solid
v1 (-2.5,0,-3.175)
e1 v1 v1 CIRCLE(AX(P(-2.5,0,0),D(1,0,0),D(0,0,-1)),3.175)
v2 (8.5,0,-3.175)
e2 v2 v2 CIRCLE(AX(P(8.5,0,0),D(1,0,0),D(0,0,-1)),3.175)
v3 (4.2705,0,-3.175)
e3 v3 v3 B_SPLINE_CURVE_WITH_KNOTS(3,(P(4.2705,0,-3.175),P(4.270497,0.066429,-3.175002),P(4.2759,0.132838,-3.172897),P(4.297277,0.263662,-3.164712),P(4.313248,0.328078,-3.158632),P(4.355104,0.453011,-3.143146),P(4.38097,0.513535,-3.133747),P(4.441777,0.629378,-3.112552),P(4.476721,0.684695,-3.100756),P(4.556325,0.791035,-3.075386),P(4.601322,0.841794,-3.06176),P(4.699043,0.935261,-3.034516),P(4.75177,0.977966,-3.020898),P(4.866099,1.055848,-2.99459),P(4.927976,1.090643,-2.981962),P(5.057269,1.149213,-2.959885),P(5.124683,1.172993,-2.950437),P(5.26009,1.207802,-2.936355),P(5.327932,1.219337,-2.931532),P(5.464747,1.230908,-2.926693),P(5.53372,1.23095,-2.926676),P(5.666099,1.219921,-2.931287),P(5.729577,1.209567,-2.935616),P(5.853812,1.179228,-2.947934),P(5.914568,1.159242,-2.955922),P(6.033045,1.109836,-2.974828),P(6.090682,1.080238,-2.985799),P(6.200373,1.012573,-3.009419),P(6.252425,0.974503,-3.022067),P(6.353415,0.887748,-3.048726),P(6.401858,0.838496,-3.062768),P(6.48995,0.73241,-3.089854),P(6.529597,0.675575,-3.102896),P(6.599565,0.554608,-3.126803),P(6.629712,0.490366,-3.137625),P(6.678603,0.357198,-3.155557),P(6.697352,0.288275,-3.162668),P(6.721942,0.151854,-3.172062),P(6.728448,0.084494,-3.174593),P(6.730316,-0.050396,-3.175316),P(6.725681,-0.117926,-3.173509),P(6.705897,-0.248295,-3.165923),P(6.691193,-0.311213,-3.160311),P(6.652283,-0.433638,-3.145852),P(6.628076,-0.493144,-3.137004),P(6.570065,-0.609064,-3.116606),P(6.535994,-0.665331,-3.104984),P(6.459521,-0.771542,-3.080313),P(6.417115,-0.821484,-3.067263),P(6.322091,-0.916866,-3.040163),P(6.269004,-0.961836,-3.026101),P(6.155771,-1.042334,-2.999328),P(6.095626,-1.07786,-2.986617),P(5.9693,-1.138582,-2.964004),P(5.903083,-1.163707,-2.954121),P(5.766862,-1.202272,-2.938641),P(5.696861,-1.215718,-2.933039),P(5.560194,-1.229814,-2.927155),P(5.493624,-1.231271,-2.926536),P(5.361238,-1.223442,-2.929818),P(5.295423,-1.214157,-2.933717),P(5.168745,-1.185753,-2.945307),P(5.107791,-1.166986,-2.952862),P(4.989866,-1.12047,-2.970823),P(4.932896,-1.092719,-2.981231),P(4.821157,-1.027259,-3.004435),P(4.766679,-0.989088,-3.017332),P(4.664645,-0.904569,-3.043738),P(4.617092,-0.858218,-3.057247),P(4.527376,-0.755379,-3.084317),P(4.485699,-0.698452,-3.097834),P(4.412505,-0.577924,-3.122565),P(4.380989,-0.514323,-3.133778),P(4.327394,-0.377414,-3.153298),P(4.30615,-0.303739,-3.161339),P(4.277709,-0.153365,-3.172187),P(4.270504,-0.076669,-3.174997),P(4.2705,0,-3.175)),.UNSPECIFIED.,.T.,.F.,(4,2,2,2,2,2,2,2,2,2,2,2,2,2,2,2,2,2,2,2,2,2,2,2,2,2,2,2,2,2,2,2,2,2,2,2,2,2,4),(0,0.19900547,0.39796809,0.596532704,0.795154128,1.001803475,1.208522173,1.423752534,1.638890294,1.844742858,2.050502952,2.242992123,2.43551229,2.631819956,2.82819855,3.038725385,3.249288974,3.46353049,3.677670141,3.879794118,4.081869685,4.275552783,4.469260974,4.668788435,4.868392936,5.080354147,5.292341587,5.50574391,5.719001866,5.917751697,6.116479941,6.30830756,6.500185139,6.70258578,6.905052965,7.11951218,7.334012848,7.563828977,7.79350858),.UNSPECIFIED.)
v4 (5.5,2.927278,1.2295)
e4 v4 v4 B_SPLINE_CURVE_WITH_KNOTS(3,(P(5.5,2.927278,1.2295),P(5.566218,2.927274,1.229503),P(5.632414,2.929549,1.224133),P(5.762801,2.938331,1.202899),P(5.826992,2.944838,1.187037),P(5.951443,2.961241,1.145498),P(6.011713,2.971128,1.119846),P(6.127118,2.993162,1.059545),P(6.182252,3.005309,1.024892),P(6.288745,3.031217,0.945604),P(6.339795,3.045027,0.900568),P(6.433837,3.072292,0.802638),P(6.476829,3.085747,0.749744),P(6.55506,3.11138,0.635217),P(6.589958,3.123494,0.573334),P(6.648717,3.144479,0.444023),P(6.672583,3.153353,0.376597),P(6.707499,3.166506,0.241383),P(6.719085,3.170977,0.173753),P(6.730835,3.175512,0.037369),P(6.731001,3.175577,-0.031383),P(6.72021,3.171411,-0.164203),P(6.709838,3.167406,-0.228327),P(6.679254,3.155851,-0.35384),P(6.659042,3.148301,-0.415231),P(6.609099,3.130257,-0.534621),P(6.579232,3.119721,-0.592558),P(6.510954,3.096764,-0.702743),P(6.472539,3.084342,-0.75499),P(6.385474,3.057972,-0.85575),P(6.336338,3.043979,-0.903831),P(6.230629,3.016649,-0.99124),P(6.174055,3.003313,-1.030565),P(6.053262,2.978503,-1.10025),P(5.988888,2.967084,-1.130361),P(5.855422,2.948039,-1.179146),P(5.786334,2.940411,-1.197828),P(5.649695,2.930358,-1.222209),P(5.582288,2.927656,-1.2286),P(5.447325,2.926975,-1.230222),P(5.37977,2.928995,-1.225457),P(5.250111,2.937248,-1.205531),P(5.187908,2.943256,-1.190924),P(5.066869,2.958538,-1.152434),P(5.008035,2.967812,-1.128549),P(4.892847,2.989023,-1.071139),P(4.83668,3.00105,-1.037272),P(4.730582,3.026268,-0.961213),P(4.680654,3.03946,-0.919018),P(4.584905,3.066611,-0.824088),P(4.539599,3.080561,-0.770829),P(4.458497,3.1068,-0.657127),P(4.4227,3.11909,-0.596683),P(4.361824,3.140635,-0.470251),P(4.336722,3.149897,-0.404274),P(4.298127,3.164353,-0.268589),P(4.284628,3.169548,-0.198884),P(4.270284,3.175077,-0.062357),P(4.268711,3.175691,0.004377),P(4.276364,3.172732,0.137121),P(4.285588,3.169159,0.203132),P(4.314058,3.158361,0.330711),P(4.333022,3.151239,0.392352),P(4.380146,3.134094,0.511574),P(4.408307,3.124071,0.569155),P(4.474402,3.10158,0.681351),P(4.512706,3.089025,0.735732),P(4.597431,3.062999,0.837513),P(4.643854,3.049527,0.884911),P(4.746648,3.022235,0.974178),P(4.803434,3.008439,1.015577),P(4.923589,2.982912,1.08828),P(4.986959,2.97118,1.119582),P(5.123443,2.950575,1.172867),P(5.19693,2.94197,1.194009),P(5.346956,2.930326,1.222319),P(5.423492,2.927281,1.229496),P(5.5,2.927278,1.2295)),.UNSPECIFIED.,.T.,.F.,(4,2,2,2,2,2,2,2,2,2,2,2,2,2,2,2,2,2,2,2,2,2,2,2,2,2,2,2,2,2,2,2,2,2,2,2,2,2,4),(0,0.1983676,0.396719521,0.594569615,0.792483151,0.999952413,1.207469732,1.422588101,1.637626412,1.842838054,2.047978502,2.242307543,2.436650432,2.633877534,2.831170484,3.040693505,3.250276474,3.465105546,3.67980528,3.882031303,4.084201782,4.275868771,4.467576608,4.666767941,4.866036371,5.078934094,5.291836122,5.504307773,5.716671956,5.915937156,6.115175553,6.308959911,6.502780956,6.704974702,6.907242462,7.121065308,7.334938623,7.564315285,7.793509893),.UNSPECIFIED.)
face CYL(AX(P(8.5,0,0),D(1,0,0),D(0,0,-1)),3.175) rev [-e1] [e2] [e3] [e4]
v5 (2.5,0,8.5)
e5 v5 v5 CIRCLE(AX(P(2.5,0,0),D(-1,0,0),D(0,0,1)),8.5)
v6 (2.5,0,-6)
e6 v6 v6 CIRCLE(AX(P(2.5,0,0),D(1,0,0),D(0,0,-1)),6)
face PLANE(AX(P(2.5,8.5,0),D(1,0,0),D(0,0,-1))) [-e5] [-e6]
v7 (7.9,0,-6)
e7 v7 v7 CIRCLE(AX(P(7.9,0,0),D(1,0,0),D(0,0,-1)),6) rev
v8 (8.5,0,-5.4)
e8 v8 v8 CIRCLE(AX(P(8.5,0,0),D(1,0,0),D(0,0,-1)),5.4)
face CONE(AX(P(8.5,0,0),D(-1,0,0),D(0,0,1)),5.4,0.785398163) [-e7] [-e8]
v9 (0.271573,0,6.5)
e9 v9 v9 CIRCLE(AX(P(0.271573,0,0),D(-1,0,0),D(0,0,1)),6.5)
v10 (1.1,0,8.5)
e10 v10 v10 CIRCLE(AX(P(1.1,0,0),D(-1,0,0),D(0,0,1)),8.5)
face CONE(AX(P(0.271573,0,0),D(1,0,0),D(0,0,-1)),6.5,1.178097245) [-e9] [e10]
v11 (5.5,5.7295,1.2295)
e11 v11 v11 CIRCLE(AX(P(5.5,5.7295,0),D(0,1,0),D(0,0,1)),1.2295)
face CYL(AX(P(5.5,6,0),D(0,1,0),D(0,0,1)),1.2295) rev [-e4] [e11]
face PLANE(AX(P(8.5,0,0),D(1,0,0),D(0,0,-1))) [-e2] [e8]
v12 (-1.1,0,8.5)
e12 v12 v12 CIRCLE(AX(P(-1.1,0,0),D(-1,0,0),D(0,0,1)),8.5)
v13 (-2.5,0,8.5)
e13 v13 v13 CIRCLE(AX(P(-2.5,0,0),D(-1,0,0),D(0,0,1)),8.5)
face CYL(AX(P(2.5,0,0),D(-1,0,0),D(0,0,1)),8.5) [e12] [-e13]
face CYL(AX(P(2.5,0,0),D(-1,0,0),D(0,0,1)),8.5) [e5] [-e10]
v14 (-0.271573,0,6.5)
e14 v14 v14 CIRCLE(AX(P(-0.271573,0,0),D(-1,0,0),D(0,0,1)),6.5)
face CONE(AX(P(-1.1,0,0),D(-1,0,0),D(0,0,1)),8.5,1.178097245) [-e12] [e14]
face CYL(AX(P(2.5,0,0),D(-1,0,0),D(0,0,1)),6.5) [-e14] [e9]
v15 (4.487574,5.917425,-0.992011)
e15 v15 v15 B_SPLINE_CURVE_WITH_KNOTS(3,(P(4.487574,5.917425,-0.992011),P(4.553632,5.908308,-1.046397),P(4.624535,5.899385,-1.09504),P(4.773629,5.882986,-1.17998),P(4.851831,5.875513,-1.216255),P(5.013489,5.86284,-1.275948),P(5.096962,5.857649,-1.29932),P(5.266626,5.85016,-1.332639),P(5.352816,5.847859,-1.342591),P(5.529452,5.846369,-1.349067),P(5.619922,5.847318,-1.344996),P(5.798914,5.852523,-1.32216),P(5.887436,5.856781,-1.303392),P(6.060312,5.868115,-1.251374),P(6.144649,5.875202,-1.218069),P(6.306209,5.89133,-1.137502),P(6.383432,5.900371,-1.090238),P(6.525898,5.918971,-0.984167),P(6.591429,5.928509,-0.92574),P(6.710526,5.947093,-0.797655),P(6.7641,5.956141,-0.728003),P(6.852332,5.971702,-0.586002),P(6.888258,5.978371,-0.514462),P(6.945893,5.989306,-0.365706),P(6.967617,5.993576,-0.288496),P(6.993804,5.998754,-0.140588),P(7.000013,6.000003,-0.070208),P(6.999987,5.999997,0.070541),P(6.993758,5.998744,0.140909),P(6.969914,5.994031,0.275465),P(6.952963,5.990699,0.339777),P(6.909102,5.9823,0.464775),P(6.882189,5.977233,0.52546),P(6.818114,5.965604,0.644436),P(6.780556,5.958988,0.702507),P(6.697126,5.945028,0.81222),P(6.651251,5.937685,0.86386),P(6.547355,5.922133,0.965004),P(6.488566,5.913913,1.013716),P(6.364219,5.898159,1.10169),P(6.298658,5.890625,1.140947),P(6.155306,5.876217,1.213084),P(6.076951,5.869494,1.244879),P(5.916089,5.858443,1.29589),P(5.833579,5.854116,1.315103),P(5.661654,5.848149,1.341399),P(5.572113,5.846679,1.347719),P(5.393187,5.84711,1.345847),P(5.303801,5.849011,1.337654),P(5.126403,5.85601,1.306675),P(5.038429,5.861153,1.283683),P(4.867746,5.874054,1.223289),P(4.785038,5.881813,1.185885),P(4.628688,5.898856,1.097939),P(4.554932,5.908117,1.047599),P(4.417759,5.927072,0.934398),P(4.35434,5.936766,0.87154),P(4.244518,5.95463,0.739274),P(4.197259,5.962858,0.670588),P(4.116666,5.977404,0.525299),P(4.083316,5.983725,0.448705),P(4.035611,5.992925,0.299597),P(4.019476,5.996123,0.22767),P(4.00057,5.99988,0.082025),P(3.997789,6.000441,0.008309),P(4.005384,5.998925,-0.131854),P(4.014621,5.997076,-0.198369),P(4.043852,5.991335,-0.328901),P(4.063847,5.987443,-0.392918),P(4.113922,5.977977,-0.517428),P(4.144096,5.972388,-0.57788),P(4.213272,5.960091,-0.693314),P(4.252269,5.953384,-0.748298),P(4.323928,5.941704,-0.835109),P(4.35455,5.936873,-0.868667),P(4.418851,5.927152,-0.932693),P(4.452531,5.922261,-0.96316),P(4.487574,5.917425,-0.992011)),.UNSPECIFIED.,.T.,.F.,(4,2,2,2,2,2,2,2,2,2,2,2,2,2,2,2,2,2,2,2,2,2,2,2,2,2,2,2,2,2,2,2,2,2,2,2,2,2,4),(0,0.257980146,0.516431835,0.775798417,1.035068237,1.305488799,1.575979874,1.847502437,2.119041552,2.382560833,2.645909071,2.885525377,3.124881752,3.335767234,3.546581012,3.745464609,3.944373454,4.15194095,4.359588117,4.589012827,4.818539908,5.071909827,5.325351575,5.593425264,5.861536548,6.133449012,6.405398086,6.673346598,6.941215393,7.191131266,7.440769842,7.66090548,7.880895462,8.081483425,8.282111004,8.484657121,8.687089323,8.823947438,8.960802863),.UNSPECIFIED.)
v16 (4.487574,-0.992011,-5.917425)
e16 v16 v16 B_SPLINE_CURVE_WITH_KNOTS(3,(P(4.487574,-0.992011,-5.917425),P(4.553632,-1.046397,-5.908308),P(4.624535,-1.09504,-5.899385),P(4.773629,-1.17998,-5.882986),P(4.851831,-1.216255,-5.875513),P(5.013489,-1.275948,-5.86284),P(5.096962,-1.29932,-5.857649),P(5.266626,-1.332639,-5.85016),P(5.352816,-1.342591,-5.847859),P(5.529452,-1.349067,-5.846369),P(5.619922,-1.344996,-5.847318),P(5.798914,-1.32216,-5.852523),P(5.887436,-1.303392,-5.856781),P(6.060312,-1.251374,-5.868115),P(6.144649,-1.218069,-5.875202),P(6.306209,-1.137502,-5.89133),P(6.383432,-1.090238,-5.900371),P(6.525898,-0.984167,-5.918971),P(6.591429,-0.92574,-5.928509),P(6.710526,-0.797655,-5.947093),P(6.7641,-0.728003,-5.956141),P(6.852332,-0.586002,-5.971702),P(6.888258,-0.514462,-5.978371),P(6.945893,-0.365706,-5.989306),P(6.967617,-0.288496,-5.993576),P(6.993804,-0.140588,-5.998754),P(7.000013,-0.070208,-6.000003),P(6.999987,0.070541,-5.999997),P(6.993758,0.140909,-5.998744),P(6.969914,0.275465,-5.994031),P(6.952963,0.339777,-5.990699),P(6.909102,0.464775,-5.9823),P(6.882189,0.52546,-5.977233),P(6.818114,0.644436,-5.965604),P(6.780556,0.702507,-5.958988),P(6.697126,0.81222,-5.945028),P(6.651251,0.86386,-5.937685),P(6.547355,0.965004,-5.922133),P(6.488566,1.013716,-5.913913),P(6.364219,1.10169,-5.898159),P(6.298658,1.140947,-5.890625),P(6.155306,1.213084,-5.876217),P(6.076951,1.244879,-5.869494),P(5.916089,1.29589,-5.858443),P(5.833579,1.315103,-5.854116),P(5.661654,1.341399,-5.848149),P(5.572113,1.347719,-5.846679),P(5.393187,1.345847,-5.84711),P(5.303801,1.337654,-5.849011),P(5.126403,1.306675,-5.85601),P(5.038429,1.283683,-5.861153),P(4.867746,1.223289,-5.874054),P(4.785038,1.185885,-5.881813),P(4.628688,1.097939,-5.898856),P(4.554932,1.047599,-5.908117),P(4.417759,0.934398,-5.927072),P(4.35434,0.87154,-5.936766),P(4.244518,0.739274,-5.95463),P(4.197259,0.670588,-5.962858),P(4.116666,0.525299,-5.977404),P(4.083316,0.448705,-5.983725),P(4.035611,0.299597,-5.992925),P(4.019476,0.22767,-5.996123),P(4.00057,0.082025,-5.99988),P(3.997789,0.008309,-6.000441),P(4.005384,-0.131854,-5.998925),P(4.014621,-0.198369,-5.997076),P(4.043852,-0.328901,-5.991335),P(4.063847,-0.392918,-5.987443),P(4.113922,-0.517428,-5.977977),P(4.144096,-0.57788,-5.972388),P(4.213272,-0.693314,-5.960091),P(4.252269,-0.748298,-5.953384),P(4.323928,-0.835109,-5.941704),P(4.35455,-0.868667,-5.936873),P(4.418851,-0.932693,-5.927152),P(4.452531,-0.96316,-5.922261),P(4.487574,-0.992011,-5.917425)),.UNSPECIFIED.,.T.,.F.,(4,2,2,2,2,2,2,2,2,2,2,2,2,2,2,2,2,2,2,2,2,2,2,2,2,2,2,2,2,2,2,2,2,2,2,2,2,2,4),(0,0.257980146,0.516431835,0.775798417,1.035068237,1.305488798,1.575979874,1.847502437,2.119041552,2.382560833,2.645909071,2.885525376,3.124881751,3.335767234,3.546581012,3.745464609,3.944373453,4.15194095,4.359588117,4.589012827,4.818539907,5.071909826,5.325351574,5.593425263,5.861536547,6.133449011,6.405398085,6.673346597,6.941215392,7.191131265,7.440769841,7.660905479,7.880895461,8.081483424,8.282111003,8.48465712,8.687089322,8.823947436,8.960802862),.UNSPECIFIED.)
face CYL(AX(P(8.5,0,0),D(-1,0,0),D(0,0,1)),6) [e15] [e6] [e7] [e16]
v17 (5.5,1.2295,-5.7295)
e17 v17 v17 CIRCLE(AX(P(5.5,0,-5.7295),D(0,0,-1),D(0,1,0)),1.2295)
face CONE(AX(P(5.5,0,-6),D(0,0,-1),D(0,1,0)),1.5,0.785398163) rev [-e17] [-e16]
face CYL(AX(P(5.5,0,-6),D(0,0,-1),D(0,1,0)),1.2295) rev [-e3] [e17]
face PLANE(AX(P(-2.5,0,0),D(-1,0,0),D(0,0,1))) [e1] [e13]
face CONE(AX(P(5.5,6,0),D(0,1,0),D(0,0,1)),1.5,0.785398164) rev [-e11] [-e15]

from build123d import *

# Parameters (mm, degrees)
SKETCH2_R           = 6
BOSS_EXTRUDE1_DEPTH = 6
HOLE1_D             = 6.35
CHAMFER1_SIZE       = 0.6


# Read off the part's stored shape, not the designer's step: CSK for M2 Flat Head Machine Screw1, CSK for M2 Flat Head Machine Screw2
with BuildPart() as part:
    # Sketch1 → Revolve1 (revolve)
    with BuildSketch(Plane(origin=(0, 0, 0), x_dir=(-1, 0, 0), z_dir=(0, 0, -1)), mode=Mode.PRIVATE) as revolve1_sk:
        Polygon((-2.5, 8.5), (-2.5, 0), (2.5, 0), (2.5, 8.5), (1.1, 8.5), (0.271572875, 6.5), (-0.271572875, 6.5), (-1.1, 8.5), align=None)
    revolve(revolve1_sk.sketch.rotate(Axis((2.5, 0, 0), (-1, 0, 0)), 270), axis=Axis((2.5, 0, 0), (-1, 0, 0)))

    # Sketch2 → Boss-Extrude1 (add)
    with BuildSketch(Plane(origin=(2.5, 0, 0), x_dir=(0, 0, -1), z_dir=(1, 0, 0))):
        Circle(SKETCH2_R)
    extrude(amount=BOSS_EXTRUDE1_DEPTH)

    # Hole1 (through all)
    with Locations(Plane(origin=(8.5, 0, 0), x_dir=(0, 0, -1), z_dir=(1, 0, 0))):
        with Locations((0, 0)):
            Hole(HOLE1_D / 2)

    # CSK for M2 Flat Head Machine Screw1 outl → CSK for M2 Flat Head Machine Screw1 (revolve, cut)
    with BuildSketch(Plane(origin=(5.5, 0, 0), x_dir=(1, 0, 0), z_dir=(0, -1, 0))):
        Polygon((0, -6.000000161), (1.500000161, -6.000000161), (1.2295, -5.7295), (1.2295, -2.927170217), (0, -2.927170217), align=None)
    revolve(axis=Axis((5.5, 0, 0), (0, 0, 1)), mode=Mode.SUBTRACT)

    # CSK for M2 Flat Head Machine Screw2 outl → CSK for M2 Flat Head Machine Screw2 (revolve, cut)
    with BuildSketch(Plane(origin=(5.5, 0, 0), x_dir=(1, 0, 0), z_dir=(0, 0, 1))):
        Polygon((1.500065457, 6.000065457), (0, 6.000065457), (0, 2.927130581), (1.2295, 2.927130581), (1.2295, 5.7295), align=None)
    revolve(axis=Axis((5.5, 0, 0), (0, 1, 0)), mode=Mode.SUBTRACT)

    # Chamfer1
    chamfer1_edges = [part.edges().sort_by_distance(p)[0] for p in [
        (8.5, 0, 6),
    ]]
    chamfer(chamfer1_edges, length=CHAMFER1_SIZE)


solid = part.part
